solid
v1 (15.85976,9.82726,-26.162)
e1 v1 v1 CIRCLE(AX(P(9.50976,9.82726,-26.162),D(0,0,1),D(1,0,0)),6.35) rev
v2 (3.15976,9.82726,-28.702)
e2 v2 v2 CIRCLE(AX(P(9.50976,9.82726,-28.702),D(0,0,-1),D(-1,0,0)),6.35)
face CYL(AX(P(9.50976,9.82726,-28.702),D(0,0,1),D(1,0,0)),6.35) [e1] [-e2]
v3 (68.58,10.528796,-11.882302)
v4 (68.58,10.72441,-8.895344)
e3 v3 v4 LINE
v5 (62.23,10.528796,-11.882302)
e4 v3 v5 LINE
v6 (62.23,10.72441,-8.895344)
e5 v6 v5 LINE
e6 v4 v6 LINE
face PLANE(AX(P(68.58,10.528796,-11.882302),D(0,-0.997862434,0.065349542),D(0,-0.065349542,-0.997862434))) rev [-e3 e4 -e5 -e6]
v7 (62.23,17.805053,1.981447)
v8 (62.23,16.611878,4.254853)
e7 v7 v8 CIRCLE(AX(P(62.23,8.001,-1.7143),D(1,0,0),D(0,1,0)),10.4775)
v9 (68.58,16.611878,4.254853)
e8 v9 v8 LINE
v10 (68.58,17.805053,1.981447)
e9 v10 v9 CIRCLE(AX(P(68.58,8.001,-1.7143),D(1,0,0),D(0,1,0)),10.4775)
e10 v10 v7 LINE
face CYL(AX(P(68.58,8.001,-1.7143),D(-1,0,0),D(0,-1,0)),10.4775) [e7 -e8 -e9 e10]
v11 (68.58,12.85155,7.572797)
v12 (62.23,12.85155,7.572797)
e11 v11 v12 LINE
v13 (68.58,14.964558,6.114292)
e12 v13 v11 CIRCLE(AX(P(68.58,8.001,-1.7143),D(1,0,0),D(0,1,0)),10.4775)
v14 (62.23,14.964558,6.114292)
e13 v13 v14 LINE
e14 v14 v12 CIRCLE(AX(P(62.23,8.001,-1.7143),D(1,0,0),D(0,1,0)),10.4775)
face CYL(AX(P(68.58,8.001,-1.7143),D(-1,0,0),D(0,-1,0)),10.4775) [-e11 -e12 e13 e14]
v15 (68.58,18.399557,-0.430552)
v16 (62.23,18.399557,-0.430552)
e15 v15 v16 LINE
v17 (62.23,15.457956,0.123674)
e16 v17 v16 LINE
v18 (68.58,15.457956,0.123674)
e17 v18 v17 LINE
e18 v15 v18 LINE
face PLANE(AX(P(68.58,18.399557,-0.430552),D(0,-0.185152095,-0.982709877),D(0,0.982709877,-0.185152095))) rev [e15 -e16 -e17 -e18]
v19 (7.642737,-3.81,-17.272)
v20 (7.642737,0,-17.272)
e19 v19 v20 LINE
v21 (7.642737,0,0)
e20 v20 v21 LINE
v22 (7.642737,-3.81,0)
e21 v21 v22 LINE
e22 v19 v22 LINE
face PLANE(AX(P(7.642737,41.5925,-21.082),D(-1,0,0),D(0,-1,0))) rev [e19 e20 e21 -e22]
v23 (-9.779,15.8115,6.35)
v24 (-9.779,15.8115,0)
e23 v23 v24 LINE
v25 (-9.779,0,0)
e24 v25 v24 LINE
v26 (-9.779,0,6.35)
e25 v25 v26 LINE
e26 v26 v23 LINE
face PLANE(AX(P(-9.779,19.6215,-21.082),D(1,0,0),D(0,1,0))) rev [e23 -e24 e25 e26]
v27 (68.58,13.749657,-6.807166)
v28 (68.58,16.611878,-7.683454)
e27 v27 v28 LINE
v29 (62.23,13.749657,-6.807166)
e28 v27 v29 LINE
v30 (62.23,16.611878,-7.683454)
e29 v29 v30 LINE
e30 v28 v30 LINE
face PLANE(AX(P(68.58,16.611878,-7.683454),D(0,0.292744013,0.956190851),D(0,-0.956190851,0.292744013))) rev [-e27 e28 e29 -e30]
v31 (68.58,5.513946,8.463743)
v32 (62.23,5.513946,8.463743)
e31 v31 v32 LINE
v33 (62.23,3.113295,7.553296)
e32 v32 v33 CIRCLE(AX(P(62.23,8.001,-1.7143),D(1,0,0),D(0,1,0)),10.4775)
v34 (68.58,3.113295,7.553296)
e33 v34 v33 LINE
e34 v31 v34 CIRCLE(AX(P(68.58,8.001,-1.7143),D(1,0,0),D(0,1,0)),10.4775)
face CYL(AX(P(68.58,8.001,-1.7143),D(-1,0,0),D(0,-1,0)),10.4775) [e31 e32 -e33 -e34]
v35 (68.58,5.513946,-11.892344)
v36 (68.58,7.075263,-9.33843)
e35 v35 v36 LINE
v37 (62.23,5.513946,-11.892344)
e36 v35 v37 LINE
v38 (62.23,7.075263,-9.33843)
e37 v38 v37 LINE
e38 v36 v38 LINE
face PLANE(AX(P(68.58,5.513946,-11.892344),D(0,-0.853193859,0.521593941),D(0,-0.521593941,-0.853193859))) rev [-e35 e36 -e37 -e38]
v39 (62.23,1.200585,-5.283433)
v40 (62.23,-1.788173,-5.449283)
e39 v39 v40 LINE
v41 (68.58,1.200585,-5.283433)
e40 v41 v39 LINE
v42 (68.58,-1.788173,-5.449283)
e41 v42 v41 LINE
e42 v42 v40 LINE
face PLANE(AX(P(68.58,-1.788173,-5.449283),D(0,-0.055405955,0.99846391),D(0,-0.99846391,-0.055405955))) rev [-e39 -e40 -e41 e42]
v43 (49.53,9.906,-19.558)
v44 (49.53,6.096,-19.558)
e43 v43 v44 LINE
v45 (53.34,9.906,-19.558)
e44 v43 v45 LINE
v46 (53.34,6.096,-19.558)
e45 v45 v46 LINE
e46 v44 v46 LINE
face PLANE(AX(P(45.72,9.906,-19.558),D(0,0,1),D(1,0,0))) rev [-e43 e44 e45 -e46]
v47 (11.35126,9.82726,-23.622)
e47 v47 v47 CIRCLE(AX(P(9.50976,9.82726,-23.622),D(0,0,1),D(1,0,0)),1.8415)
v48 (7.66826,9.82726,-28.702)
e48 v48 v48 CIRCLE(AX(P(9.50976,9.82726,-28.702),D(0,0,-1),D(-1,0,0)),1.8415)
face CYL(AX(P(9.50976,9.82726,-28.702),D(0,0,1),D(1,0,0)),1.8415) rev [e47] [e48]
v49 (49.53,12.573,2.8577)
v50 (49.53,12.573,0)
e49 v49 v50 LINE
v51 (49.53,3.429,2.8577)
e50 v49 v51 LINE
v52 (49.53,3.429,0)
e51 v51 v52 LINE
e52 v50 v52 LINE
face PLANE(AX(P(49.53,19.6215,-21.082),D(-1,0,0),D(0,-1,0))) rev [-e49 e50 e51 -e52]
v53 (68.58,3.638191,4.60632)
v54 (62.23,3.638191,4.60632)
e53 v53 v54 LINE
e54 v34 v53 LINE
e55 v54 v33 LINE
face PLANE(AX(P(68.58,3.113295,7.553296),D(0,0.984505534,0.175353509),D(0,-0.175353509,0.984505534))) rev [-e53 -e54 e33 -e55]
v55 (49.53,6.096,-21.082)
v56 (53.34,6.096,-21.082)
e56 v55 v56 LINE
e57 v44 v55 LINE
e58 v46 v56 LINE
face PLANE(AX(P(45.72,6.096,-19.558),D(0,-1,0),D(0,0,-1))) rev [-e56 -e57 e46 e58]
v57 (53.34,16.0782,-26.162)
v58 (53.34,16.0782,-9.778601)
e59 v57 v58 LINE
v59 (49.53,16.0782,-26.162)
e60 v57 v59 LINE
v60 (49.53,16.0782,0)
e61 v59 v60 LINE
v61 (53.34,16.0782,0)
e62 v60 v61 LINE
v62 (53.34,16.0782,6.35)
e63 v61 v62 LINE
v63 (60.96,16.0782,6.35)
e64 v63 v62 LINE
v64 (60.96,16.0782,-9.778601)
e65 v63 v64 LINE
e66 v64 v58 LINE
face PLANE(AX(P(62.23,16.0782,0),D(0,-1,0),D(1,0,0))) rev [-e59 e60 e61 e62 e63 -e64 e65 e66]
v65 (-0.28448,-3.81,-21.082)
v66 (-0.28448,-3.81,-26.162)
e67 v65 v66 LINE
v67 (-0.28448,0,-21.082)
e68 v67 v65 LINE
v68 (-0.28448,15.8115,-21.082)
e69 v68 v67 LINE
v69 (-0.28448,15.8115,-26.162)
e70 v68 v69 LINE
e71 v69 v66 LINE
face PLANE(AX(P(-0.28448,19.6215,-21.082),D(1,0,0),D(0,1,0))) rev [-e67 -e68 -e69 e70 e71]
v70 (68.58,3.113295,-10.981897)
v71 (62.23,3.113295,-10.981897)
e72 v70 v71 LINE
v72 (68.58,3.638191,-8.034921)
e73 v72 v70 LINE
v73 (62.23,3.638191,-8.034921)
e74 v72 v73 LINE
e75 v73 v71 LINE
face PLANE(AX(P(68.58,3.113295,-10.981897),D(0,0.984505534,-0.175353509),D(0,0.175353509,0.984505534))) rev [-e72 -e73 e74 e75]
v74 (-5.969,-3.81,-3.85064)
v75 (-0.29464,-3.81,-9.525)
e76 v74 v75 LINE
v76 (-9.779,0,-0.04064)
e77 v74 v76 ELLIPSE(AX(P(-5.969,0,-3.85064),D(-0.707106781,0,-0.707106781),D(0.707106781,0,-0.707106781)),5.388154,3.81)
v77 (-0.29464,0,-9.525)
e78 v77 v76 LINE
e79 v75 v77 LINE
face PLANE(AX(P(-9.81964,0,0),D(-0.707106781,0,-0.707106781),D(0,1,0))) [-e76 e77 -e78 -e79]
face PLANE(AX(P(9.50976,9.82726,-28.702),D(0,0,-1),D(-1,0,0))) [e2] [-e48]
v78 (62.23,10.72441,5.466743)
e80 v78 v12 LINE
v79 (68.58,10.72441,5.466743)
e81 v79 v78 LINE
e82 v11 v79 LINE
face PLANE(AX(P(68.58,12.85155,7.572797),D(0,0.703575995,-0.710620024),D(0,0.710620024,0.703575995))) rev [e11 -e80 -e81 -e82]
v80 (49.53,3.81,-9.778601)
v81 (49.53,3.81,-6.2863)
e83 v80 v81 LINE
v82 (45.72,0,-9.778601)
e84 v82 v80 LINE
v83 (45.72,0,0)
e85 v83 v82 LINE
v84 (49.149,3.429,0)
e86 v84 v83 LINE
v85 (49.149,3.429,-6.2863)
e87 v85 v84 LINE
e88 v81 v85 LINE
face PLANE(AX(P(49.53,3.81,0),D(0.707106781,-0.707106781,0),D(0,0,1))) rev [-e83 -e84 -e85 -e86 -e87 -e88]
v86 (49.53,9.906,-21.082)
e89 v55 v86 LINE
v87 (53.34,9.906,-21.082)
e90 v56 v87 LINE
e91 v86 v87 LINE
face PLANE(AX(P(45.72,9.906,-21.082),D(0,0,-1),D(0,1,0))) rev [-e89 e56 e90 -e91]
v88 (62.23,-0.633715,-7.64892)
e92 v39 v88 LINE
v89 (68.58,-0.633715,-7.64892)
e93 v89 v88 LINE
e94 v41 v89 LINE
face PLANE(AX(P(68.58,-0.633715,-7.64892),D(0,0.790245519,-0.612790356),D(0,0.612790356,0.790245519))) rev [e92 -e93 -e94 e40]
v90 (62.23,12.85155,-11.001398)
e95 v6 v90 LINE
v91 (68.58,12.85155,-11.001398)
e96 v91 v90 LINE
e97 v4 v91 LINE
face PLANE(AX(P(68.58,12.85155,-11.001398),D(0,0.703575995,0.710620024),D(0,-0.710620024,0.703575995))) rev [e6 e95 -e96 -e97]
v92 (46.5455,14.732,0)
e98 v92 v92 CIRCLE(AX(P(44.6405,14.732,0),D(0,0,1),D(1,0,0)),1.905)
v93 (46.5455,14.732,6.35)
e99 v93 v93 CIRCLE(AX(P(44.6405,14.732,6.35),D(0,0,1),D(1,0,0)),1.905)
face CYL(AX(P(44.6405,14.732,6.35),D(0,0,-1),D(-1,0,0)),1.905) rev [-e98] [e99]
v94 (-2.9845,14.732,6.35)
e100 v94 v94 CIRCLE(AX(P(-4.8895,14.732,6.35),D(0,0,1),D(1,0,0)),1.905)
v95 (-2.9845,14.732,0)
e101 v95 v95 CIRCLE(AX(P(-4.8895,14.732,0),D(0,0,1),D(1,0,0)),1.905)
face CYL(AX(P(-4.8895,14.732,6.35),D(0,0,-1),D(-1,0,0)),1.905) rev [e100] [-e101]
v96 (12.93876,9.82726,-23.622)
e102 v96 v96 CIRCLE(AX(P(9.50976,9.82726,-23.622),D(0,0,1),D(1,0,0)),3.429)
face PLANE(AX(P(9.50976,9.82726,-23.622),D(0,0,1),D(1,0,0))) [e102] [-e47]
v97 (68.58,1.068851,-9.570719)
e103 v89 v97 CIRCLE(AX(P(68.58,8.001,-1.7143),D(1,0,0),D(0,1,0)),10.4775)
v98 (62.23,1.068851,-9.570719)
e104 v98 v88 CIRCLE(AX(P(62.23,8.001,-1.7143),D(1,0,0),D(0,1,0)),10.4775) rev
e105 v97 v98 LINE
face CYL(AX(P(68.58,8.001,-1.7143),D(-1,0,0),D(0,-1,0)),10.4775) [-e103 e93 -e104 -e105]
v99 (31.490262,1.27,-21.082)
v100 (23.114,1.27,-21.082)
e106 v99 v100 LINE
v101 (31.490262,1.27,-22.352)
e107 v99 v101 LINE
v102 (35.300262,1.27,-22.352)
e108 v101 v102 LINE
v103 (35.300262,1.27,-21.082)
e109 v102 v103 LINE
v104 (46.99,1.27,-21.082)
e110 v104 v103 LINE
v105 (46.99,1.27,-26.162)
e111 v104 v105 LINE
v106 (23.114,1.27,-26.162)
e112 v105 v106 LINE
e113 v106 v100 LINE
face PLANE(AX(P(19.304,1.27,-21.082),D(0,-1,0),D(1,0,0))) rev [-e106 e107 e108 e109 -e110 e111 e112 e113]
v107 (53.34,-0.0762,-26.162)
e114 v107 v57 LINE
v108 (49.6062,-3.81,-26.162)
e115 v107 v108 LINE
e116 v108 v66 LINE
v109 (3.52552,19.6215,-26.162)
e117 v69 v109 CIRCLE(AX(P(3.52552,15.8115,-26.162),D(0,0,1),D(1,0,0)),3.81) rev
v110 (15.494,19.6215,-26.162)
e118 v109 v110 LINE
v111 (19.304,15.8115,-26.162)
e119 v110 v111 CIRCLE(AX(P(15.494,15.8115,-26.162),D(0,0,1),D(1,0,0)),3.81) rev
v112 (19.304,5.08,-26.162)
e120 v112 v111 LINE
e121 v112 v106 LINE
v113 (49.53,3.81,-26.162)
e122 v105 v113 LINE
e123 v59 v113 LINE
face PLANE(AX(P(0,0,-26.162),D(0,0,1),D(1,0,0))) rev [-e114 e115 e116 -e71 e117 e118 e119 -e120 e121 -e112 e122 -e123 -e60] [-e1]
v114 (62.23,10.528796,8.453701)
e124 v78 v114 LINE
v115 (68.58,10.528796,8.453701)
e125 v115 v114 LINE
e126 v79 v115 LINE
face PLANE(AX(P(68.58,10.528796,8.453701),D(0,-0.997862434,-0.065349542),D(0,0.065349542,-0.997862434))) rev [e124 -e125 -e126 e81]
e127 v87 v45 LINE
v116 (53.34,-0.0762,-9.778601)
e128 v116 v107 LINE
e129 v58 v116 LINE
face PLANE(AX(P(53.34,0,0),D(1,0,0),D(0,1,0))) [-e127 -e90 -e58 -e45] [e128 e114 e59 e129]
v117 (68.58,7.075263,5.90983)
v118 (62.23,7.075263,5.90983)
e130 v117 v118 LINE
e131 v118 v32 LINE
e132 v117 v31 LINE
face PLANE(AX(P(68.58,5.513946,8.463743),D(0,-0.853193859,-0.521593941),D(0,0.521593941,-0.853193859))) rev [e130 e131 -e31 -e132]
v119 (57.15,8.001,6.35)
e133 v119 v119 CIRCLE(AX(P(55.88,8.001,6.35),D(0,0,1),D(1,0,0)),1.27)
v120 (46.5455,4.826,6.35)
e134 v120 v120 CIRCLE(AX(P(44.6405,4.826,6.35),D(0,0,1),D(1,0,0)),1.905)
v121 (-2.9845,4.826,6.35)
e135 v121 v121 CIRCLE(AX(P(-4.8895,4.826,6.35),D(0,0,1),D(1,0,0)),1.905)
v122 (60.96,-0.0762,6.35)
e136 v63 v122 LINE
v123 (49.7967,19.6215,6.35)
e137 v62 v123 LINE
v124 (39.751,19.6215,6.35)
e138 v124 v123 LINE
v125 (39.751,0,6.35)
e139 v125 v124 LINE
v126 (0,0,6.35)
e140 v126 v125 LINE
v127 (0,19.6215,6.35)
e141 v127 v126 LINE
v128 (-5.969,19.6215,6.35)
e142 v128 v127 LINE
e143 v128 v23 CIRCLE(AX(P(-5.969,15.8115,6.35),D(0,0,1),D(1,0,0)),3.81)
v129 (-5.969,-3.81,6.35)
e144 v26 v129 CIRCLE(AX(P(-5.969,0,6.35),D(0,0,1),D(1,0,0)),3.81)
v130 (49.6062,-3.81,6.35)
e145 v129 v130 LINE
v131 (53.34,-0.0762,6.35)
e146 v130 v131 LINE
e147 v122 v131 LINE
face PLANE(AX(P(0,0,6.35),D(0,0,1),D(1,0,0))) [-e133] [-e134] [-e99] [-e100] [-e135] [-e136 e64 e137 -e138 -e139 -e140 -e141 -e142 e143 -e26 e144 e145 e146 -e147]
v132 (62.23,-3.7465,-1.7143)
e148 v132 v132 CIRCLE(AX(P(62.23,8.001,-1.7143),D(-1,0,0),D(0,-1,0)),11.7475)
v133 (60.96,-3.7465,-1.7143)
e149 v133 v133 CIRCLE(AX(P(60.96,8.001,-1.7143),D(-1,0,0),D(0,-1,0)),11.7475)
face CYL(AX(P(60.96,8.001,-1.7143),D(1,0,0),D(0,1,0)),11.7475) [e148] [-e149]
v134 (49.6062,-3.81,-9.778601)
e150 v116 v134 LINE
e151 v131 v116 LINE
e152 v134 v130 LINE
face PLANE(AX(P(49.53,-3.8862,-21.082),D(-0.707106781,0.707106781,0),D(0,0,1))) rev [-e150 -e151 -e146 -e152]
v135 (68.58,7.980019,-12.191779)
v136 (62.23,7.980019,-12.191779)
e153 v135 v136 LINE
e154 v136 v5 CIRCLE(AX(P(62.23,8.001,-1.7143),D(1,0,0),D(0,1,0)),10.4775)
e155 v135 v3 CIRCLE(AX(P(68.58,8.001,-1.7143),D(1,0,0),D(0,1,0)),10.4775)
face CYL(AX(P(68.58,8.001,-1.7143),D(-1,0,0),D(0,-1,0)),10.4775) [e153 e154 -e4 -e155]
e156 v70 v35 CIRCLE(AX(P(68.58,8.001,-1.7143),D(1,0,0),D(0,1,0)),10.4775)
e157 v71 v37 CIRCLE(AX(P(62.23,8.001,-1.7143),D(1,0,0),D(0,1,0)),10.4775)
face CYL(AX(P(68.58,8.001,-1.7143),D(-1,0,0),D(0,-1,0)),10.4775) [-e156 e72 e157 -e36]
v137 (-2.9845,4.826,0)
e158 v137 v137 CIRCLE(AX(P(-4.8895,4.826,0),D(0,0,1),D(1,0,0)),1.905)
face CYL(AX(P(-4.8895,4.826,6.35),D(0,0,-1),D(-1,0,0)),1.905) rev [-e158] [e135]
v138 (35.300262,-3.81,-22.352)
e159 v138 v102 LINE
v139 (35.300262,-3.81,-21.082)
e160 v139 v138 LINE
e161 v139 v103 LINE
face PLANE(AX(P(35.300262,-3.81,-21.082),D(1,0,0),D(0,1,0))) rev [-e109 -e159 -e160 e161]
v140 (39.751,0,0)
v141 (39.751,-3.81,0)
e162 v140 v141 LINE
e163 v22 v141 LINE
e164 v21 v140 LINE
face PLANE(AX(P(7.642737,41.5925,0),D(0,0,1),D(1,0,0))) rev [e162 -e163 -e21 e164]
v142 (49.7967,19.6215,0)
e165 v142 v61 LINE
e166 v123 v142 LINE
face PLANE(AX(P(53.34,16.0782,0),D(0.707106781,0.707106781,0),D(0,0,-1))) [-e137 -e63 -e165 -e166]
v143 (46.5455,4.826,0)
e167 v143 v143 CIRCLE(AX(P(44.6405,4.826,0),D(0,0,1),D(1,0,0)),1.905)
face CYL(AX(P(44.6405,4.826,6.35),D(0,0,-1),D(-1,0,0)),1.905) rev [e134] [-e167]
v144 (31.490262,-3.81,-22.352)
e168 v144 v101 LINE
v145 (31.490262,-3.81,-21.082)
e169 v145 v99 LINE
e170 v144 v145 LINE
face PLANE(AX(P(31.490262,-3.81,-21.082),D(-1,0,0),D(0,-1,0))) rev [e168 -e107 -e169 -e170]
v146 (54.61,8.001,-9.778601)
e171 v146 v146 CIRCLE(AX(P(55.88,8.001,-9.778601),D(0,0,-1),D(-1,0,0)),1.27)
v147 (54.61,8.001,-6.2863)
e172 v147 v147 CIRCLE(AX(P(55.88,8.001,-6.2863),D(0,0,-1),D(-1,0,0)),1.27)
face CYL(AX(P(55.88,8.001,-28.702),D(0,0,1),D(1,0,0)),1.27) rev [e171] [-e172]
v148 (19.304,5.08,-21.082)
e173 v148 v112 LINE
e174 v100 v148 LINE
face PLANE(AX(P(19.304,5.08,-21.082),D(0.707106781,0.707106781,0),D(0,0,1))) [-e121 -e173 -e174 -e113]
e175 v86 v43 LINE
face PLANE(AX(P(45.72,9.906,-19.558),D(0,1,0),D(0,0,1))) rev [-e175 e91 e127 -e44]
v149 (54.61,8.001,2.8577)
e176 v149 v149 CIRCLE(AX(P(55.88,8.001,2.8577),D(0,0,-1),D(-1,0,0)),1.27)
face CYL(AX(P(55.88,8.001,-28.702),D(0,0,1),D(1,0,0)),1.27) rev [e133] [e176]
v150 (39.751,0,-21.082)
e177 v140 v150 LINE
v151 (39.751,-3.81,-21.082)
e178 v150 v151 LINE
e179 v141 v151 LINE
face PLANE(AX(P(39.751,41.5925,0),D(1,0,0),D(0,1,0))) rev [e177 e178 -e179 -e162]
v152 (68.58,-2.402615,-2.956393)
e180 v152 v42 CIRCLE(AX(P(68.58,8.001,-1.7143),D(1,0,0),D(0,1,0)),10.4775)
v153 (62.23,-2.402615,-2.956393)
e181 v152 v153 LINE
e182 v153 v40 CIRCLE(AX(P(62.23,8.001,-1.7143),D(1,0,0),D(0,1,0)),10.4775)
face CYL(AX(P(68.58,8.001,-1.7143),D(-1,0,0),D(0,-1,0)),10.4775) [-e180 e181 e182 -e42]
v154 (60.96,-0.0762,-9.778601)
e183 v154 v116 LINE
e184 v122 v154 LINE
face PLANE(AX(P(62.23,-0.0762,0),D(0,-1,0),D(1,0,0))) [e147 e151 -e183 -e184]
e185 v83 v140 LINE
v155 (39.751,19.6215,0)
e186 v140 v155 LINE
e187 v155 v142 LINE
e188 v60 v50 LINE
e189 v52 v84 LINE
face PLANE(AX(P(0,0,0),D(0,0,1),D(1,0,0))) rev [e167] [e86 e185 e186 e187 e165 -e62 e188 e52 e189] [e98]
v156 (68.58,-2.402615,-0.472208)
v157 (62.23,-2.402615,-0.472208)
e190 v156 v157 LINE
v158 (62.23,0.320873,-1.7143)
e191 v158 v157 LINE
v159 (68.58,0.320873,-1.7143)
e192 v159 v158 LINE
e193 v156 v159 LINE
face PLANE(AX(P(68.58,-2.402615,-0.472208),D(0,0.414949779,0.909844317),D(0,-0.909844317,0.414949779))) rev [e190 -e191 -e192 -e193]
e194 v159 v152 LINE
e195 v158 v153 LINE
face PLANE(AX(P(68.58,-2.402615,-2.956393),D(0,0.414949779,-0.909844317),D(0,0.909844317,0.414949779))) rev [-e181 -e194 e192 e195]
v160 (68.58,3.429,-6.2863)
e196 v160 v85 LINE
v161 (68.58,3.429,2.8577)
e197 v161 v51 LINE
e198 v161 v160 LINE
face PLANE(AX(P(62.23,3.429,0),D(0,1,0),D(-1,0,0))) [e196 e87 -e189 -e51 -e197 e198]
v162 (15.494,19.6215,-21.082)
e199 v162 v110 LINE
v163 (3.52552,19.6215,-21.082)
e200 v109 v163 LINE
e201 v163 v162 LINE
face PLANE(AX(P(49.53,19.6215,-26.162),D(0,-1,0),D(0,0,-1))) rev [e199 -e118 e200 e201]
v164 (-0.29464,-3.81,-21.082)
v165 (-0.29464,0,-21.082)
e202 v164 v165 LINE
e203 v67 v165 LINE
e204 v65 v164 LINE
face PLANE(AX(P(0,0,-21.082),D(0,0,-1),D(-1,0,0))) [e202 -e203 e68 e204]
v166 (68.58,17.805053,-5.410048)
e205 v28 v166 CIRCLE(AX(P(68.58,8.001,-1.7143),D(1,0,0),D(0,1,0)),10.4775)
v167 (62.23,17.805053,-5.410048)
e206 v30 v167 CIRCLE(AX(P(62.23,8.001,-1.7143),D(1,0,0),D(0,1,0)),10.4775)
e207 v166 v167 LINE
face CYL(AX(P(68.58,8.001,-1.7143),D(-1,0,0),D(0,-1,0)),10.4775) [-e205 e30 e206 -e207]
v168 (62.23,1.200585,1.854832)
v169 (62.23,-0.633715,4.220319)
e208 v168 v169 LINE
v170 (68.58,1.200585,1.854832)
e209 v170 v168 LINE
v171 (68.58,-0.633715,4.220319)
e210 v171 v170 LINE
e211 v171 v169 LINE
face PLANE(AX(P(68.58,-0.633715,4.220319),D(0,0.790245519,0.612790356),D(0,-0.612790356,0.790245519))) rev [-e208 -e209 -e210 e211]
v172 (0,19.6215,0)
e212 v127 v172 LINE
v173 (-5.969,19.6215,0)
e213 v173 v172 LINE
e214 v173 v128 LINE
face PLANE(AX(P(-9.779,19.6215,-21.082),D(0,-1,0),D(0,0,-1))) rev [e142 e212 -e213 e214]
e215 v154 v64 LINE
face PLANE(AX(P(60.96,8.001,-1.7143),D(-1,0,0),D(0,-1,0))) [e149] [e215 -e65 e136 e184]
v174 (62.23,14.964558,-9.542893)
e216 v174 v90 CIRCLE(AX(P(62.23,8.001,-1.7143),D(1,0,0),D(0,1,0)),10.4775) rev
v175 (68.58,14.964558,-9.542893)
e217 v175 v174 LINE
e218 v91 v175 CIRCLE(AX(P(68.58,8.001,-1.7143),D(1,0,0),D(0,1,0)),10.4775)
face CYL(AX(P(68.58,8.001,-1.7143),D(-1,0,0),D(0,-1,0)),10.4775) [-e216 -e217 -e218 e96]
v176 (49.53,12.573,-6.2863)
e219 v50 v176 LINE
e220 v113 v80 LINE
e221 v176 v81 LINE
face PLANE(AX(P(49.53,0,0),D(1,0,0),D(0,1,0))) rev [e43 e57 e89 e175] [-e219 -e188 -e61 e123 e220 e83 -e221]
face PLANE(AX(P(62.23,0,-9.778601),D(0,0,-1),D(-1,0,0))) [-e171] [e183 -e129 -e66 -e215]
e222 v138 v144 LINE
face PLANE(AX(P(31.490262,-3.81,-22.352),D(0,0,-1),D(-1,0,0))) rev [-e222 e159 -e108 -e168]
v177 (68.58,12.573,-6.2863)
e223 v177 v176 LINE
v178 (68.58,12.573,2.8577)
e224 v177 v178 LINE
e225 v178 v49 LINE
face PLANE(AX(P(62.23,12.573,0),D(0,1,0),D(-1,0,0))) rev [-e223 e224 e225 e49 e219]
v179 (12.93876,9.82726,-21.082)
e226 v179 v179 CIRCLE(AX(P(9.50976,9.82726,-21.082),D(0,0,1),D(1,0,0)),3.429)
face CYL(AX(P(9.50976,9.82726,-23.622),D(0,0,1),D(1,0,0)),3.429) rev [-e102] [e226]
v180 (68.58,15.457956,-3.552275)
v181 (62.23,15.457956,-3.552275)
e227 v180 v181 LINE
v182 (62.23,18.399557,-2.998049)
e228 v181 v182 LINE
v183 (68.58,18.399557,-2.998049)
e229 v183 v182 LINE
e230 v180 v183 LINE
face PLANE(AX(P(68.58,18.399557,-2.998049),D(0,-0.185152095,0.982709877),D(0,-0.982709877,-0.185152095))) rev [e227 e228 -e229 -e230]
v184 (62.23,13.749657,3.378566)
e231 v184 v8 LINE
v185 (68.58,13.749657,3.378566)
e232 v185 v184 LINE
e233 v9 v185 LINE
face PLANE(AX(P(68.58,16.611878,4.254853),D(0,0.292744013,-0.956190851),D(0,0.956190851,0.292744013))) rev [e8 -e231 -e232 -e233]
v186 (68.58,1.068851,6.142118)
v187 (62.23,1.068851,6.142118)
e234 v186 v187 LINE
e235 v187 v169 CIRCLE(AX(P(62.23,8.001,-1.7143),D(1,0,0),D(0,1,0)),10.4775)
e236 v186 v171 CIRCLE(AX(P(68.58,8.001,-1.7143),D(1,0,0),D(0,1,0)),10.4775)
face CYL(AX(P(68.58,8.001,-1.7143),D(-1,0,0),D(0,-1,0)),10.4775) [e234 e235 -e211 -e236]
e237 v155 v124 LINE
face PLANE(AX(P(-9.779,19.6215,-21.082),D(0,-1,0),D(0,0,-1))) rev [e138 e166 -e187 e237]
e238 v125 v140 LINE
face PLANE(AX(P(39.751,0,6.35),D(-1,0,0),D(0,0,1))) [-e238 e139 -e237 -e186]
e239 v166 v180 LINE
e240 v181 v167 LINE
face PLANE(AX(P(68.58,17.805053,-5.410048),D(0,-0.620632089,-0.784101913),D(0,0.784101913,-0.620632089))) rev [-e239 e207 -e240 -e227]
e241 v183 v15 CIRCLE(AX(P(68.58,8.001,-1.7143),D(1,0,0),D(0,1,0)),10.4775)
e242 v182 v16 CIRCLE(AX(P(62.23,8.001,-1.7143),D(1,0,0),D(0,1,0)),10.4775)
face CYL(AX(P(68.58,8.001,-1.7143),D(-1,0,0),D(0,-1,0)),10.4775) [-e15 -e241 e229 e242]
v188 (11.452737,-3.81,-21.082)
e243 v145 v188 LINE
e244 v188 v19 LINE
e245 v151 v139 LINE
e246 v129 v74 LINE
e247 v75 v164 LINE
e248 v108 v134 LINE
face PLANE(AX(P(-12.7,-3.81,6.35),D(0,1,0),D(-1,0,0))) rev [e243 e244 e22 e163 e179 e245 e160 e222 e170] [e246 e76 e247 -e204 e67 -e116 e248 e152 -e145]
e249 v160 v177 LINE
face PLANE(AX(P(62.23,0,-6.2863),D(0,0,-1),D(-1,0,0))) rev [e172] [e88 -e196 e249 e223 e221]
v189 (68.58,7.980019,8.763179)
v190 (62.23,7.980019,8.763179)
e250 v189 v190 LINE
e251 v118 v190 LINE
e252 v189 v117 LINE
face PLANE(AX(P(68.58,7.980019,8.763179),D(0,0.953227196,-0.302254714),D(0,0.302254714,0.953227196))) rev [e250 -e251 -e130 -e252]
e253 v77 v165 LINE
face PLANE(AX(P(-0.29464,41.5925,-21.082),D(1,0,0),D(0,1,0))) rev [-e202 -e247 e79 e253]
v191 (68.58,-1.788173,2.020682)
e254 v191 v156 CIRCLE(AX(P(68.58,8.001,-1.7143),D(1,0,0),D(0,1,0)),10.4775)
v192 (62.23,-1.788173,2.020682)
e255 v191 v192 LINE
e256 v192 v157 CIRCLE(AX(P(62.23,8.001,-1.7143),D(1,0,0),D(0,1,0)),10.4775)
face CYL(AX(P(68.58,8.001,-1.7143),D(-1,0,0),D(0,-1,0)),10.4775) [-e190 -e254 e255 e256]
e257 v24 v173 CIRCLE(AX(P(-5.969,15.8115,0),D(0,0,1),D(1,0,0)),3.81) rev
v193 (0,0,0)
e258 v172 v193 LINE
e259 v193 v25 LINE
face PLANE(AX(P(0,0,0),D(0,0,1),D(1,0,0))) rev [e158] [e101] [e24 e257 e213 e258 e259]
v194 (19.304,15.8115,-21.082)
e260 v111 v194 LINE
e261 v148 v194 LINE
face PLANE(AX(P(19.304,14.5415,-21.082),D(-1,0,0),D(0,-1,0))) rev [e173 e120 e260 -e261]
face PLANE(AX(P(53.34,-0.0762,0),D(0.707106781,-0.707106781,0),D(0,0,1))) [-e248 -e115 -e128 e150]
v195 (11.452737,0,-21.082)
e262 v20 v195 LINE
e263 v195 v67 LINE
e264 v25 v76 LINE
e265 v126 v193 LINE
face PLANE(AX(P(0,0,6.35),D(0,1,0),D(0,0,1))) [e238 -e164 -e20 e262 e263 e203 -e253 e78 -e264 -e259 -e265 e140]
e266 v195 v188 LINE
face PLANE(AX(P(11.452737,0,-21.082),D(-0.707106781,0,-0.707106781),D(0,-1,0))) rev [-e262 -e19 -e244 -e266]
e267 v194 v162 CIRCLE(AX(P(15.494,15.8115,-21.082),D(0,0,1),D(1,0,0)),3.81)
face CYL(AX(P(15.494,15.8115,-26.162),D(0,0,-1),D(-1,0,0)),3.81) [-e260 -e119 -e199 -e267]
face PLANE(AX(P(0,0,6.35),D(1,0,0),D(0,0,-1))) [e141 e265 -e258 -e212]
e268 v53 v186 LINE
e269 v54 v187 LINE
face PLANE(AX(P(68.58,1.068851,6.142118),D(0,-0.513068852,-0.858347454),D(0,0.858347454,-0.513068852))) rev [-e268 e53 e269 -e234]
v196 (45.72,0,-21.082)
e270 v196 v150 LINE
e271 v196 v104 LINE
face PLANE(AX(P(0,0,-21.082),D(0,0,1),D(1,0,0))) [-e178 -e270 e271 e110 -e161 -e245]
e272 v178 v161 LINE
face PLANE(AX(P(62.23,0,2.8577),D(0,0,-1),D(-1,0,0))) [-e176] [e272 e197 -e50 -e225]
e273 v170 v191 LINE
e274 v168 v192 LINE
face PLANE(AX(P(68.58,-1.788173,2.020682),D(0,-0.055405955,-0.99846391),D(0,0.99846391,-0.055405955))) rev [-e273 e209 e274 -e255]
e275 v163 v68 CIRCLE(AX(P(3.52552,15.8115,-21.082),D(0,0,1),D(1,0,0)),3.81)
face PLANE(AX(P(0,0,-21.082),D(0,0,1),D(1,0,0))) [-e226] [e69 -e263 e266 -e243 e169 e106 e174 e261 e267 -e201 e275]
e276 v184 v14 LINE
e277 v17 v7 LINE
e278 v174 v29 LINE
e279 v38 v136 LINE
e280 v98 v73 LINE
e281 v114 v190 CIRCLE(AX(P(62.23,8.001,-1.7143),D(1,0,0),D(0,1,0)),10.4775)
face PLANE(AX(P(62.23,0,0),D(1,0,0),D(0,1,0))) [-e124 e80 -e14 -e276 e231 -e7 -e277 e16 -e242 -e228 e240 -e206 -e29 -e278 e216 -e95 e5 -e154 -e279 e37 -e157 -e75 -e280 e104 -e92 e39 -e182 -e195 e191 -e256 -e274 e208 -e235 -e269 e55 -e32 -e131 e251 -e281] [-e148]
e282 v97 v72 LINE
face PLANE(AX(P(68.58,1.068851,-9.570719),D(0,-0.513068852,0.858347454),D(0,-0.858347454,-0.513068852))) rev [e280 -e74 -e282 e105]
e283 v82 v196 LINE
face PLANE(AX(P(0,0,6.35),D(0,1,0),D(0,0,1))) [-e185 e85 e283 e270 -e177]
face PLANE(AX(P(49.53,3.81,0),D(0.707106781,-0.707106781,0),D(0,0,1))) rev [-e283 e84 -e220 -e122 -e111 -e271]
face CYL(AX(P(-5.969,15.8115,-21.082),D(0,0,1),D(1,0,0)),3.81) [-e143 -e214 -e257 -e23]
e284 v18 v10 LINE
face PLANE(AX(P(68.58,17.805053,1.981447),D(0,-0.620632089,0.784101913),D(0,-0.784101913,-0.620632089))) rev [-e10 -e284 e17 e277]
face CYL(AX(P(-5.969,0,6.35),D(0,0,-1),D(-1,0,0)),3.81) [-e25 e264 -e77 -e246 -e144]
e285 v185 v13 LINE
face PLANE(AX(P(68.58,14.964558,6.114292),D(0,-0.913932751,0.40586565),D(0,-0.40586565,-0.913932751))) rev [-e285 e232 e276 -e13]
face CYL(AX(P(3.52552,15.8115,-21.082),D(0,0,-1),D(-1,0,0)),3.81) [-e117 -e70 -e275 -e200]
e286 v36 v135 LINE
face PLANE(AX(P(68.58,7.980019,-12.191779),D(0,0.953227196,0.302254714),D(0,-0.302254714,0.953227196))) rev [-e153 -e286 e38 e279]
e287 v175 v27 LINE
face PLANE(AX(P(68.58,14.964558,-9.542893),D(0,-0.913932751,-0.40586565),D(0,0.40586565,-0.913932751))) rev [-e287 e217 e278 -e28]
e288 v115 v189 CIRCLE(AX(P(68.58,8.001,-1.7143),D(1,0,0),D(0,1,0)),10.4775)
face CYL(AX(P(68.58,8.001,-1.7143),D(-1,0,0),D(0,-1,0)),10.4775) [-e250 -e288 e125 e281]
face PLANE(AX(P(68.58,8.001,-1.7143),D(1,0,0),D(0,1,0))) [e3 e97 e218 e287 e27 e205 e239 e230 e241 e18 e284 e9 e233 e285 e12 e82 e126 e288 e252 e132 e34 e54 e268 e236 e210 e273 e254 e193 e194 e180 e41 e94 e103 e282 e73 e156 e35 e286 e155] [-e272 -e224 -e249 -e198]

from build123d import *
from build123d.topology import SkipClean

# Parameters (mm, degrees)
SKETCH1_W                = 65.151
SKETCH1_H                = 27.178
SKETCH1_R                = 1.905
SKETCH1_W_2              = 39.751
SKETCH1_H_2              = 19.558
BOSS_EXTRUDE1_DEPTH      = 6.35
SKETCH2_W                = 39.751
SKETCH2_H                = 10.24711365
CUT_EXTRUDE1_DEPTH       = 58.77104227
SKETCH3_W                = 65.151
SKETCH3_H                = 3.81
BOSS_EXTRUDE2_DEPTH      = 27.432
CUT_EXTRUDE2_DEPTH       = 64.637138913
CUT_EXTRUDE2_DEPTH_BACK  = 64.637138913
SKETCH5_W                = 59.309
SKETCH5_H                = 23.4315
BOSS_EXTRUDE3_DEPTH      = 5.08
SKETCH6_R                = 6.35
SKETCH6_R_2              = 1.8415
BOSS_EXTRUDE4_DEPTH      = 2.54
CUT_EXTRUDE3_DEPTH       = 63.411972459
CUT_EXTRUDE3_DEPTH_BACK  = 63.411972459
SKETCH7_R                = 1.8415
SKETCH8_R                = 3.429
CUT_EXTRUDE4_DEPTH       = 2.54
SKETCH9_R                = 3.6195
SKETCH9_W                = 2.794
SKETCH9_H                = 1.524
BOSS_EXTRUDE5_DEPTH      = 3.81
CUT_EXTRUDE5_DEPTH       = 74.064442174
CUT_EXTRUDE5_DEPTH_BACK  = 74.064442174
SKETCH10_W               = 32.108263301
SKETCH10_H               = 21.082
SKETCH12_W               = 16.128600802
SKETCH12_H               = 16.1544
SKETCH12_W_2             = 9.144
SKETCH12_H_2             = 9.144
BOSS_EXTRUDE8_DEPTH      = 12.7
CHAMFER1_SIZE            = 3.81
SKETCH13_W               = 16.383399198
SKETCH13_H               = 19.8882
BOSS_EXTRUDE9_DEPTH      = 3.81
CHAMFER2_SIZE            = 3.7338
CHAMFER3_SIZE            = 3.7338
CUT_EXTRUDE7_DEPTH       = 83.650781365
CUT_EXTRUDE7_DEPTH_BACK  = 83.650781365
SKETCH14_R               = 1.27
SKETCH15_W               = 15.950556953
SKETCH15_H               = 26.00484576
SKETCH15_W_2             = 25.3365
SKETCH15_H_2             = 13.2715
CUT_EXTRUDE8_DEPTH       = 5.08
CHAMFER4_SIZE            = 9.525
FILLET1_R                = 3.81
CUT_EXTRUDE9_DEPTH       = 6.35
CHAMFER6_SIZE            = 3.81
FILLET2_R                = 3.81
CHAMFER7_SIZE            = 3.81
CUT_EXTRUDE10_DEPTH      = 71.944733816
CUT_EXTRUDE10_DEPTH_BACK = 71.944733816
SKETCH17_W               = 3.81
SKETCH17_H               = 1.27
SKETCH18_W               = 9.144
SKETCH18_H               = 9.144
BOSS_EXTRUDE10_DEPTH     = 6.35
SKETCH19_R               = 11.7475
SKETCH19_W               = 9.144
SKETCH19_H               = 9.144
BOSS_EXTRUDE11_DEPTH     = 1.27
SKETCH20_W               = 1.524
SKETCH20_H               = 3.81
CUT_EXTRUDE11_DEPTH      = 7.62


# Some blends are built 0.0001 mm under size
with BuildPart() as part:
    # Sketch1 → Boss-Extrude1 (new body)
    with BuildSketch(Plane.XY):
        with Locations((19.8755, 9.779)):
            Rectangle(SKETCH1_W, SKETCH1_H)
        with Locations((-4.8895, 14.732)):
            Circle(SKETCH1_R, mode=Mode.SUBTRACT)
        with Locations((-4.8895, 4.826)):
            Circle(SKETCH1_R, mode=Mode.SUBTRACT)
        with Locations((44.6405, 14.732)):
            Circle(SKETCH1_R, mode=Mode.SUBTRACT)
        with Locations((44.6405, 4.826)):
            Circle(SKETCH1_R, mode=Mode.SUBTRACT)
        with Locations((19.8755, 9.779)):
            Rectangle(SKETCH1_W_2, SKETCH1_H_2, mode=Mode.SUBTRACT)
    extrude(amount=BOSS_EXTRUDE1_DEPTH)

    # Sketch2 → Cut-Extrude1 (cut, through all)
    with BuildSketch(Plane.XY.offset(6.35)):
        with Locations((19.8755, 24.681556825)):
            Rectangle(SKETCH2_W, SKETCH2_H)
    extrude(amount=-CUT_EXTRUDE1_DEPTH, mode=Mode.SUBTRACT)

    # Sketch3 → Boss-Extrude2 (add)
    with BuildSketch(Plane.XY.offset(6.35)):
        with Locations((19.8755, -1.905)):
            Rectangle(SKETCH3_W, SKETCH3_H)
    extrude(amount=-BOSS_EXTRUDE2_DEPTH)

    # Sketch4 → Cut-Extrude2 (cut, two sides: drawn at the far end of the back side and taken through both)
    with BuildSketch(Plane.XY.offset(6.35).offset(-CUT_EXTRUDE2_DEPTH_BACK)):
        Polygon((-9.779, 19.6215), (49.53, 19.6215), (49.53, -10.761505665), (52.451, -10.761505665), (52.451, 19.6215), (59.186276442, 19.6215), (59.186276442, 27.845167488), (-19.143020513, 27.845167488), (-19.143020513, 19.6215), (-12.7, 19.6215), (-12.7, -7.490212521), (-9.779, -7.490212521), align=None)
    extrude(amount=CUT_EXTRUDE2_DEPTH + CUT_EXTRUDE2_DEPTH_BACK, mode=Mode.SUBTRACT)

    # Sketch5 → Boss-Extrude3 (add)
    with BuildSketch(Plane(origin=(0, 0, -21.082), x_dir=(-1, 0, 0), z_dir=(0, 0, -1))):
        with Locations((-19.8755, 7.90575)):
            Rectangle(SKETCH5_W, SKETCH5_H)
    extrude(amount=BOSS_EXTRUDE3_DEPTH)

    # Sketch6 → Boss-Extrude4 (add)
    with BuildSketch(Plane(origin=(0, 0, -26.162), x_dir=(-1, 0, 0), z_dir=(0, 0, -1))):
        with Locations(Location((-9.50976, 9.82726, 0), (0, 0, 180))):
            Circle(SKETCH6_R)
        with Locations((-9.50976, 9.82726)):
            Circle(SKETCH6_R_2, mode=Mode.SUBTRACT)
    extrude(amount=BOSS_EXTRUDE4_DEPTH)

    # Sketch7 → Cut-Extrude3 (cut, two sides: drawn at the far end of the back side and taken through both)
    with SkipClean():  # the faces are left unmerged after this step: merging them gives an invalid solid
        with BuildSketch(Plane(origin=(0, 0, -26.162), x_dir=(-1, 0, 0), z_dir=(0, 0, -1)).offset(-CUT_EXTRUDE3_DEPTH_BACK)):
            with Locations(Location((-9.50976, 9.82726, 0), (0, 0, 180))):
                Circle(SKETCH7_R)
        extrude(amount=CUT_EXTRUDE3_DEPTH + CUT_EXTRUDE3_DEPTH_BACK, mode=Mode.SUBTRACT)
    add(part.part.scale(1), mode=Mode.REPLACE)  # the faces are merged on a copy

    # Sketch8 → Cut-Extrude4 (cut)
    with BuildSketch(Plane.XY.offset(-21.082)):
        with Locations((9.50976, 9.82726)):
            Circle(SKETCH8_R)
    extrude(amount=-CUT_EXTRUDE4_DEPTH, mode=Mode.SUBTRACT)

    # Sketch9 → Boss-Extrude5 (add)
    with BuildSketch(Plane(origin=(0, 0, -26.162), x_dir=(-1, 0, 0), z_dir=(0, 0, -1))):
        with BuildLine():
            Line((-35.644817518, 19.6215), (-35.644817518, 35.2425))
            ThreePointArc((-35.644817518, 35.2425), (-29.294817518, 41.5925), (-22.944817518, 35.2425))
            Line((-22.944817518, 35.2425), (-22.944817518, 28.829))
            Line((-22.944817518, 28.829), (-22.944817518, 25.2095))
            Line((-22.944817518, 25.2095), (-22.944817518, 19.6215))
            ThreePointArc((-22.944817518, 19.6215), (-29.294817518, 13.2715), (-35.644817518, 19.6215))
        make_face()
        with Locations((-29.294817518, 28.829)):
            Circle(SKETCH9_R, mode=Mode.SUBTRACT)
        with Locations((-29.294817518, 37.0205)):
            Rectangle(SKETCH9_W, SKETCH9_H, mode=Mode.SUBTRACT)
    extrude(amount=-BOSS_EXTRUDE5_DEPTH)

    # Sketch10 → Cut-Extrude5 (cut, two sides: drawn at the far end of the back side and taken through both)
    with SkipClean():  # the faces are left unmerged after this step: merging them gives an invalid solid
        with BuildSketch(Plane.XZ.offset(3.81).offset(-CUT_EXTRUDE5_DEPTH_BACK)):
            with Locations((23.69686835, -10.541)):
                Rectangle(SKETCH10_W, SKETCH10_H)
            Polygon((-9.779, 0), (-9.779, -26.162), (-0.29464, -26.162), (-0.29464, -21.082), (-0.29464, 0), align=None)
        extrude(amount=CUT_EXTRUDE5_DEPTH + CUT_EXTRUDE5_DEPTH_BACK, mode=Mode.SUBTRACT)

    # Sketch12 → Boss-Extrude8 (add)
    with SkipClean():  # the faces are left unmerged after this step: merging them gives an invalid solid
        with BuildSketch(Plane(origin=(49.53, 0, 0), x_dir=(0, 0, -1), z_dir=(1, 0, 0))):
            with Locations((1.714300401, 8.001)):
                Rectangle(SKETCH12_W, SKETCH12_H)
            with Locations((1.714300401, 8.001)):
                Rectangle(SKETCH12_W_2, SKETCH12_H_2, mode=Mode.SUBTRACT)
        extrude(amount=BOSS_EXTRUDE8_DEPTH)

    # Chamfer1
    # the kernel refuses this chamfer: 3.81 mm, written as the material it adds along each edge
    with BuildSketch(Plane(origin=(49.53, 0, 9.798112184), x_dir=(-0.9996219169112968, -0.02749587661058634, 0), z_dir=(0, 0, -1))) as chamfer1_piece_1_section:
        Polygon((CHAMFER1_SIZE * 0.999621916911, CHAMFER1_SIZE * 0.0274958766106), (-CHAMFER1_SIZE * 0.0274958766106, CHAMFER1_SIZE * 0.999621916911), (0, 0), align=None)
    chamfer1_piece_1 = extrude(amount=19.576712986, mode=Mode.PRIVATE)
    chamfer1_piece_1 = split(chamfer1_piece_1, bisect_by=Plane(origin=(48.248454545, 3.429, -3.1431502), z_dir=(0, -1, 0)), keep=Keep.TOP, mode=Mode.PRIVATE)
    chamfer1_piece_1 = split(chamfer1_piece_1, bisect_by=Plane(origin=(48.248454545, 1.246909091, 2.857699599), z_dir=(0, 0, -1)), keep=Keep.TOP, mode=Mode.PRIVATE)
    add(chamfer1_piece_1)
    with BuildSketch(Plane(origin=(49.53, 0, 9.798112184), x_dir=(-0.9996219169112968, -0.02749587661058634, 0), z_dir=(0, 0, -1))) as chamfer1_piece_2_section:
        Polygon((CHAMFER1_SIZE * 0.999621916911, CHAMFER1_SIZE * 0.0274958766106), (-CHAMFER1_SIZE * 0.0274958766106, CHAMFER1_SIZE * 0.999621916911), (0, 0), align=None)
    chamfer1_piece_2 = extrude(amount=19.576712986, mode=Mode.PRIVATE)
    chamfer1_piece_2 = split(chamfer1_piece_2, bisect_by=Plane(origin=(49.403, 3.556, -6.286300401), z_dir=(0, 0, -1)), keep=Keep.TOP, mode=Mode.PRIVATE)
    add(chamfer1_piece_2)
    with BuildSketch(Plane(origin=(49.53, -0.0762, 6.35), x_dir=(-0.027495876610586376, -0.9996219169112968, 0), z_dir=(0, 0, -1))) as chamfer1_piece_3_section:
        Polygon((CHAMFER1_SIZE * 0.999621916911, -CHAMFER1_SIZE * 0.0274958766106), (-CHAMFER1_SIZE * 0.0274958766106, -CHAMFER1_SIZE * 0.999621916911), (0, 0), align=None)
    chamfer1_piece_3 = extrude(amount=16.128600802, mode=Mode.PRIVATE)
    chamfer1_piece_3 = split(chamfer1_piece_3, bisect_by=Plane(origin=(50.800498039, -3.81, -1.714300401), z_dir=(0, 1, 0)), keep=Keep.TOP, mode=Mode.PRIVATE)
    add(chamfer1_piece_3)
    with BuildSketch(Plane(origin=(49.53, 16.0782, 0), x_dir=(-0.027495876610586386, 0.9996219169112968, 0), z_dir=(0, 0, 1))) as chamfer1_piece_4_section:
        Polygon((CHAMFER1_SIZE * 0.999621916911, -CHAMFER1_SIZE * 0.0274958766106), (-CHAMFER1_SIZE * 0.0274958766106, -CHAMFER1_SIZE * 0.999621916911), (0, 0), align=None)
    chamfer1_piece_4 = extrude(amount=6.35, mode=Mode.PRIVATE)
    chamfer1_piece_4 = split(chamfer1_piece_4, bisect_by=Plane(origin=(50.805815888, 19.6215, 3.175), z_dir=(0, -1, 0)), keep=Keep.TOP, mode=Mode.PRIVATE)
    add(chamfer1_piece_4)

    # Sketch13 → Boss-Extrude9 (add)
    with BuildSketch(Plane(origin=(49.53, 0, 0), x_dir=(0, 0, -1), z_dir=(1, 0, 0))):
        with Locations((17.970300401, 6.1341)):
            Rectangle(SKETCH13_W, SKETCH13_H)
    extrude(amount=BOSS_EXTRUDE9_DEPTH)

    # Chamfer2
    chamfer2_edges = [part.edges().sort_by_distance(p)[0] for p in [
        (53.34, -3.81, -17.970300401),
    ]]
    chamfer(chamfer2_edges, length=CHAMFER2_SIZE - 0.0001)  # a hair under: the kernel refuses the full size

    # Chamfer3
    # the kernel refuses this chamfer: 3.7338 mm, written as the material it adds along each edge
    with BuildSketch(Plane(origin=(49.53, 16.0782, -21.082), x_dir=(0.9996219169112968, -0.027495876610586435, 0), z_dir=(0, 0, -1))) as chamfer3_piece_1_section:
        Polygon((CHAMFER3_SIZE * 0.999621916911, -CHAMFER3_SIZE * 0.0274958766106), (-CHAMFER3_SIZE * 0.0274958766106, -CHAMFER3_SIZE * 0.999621916911), (0, 0), align=None)
    chamfer3_piece_1 = extrude(amount=5.08, mode=Mode.PRIVATE)
    chamfer3_piece_1 = split(chamfer3_piece_1, bisect_by=Plane(origin=(50.777682524, 19.6215, -23.622), z_dir=(0, -1, 0)), keep=Keep.TOP, mode=Mode.PRIVATE)
    add(chamfer3_piece_1)

    # Sketch14 → Cut-Extrude7 (cut, two sides: drawn at the far end of the back side and taken through both)
    with BuildSketch(Plane.XY.offset(6.35).offset(-CUT_EXTRUDE7_DEPTH_BACK)):
        with Locations(Location((55.88, 8.001, 0), (0, 0, 180))):
            Circle(SKETCH14_R)
    extrude(amount=CUT_EXTRUDE7_DEPTH + CUT_EXTRUDE7_DEPTH_BACK, mode=Mode.SUBTRACT)

    # Sketch15 → Cut-Extrude8 (cut)
    with BuildSketch(Plane(origin=(0, 0, -26.162), x_dir=(-1, 0, 0), z_dir=(0, 0, -1))):
        with Locations((8.259758477, 6.61907712)):
            Rectangle(SKETCH15_W, SKETCH15_H)
        with Locations((-31.97225, 7.90575)):
            Rectangle(SKETCH15_W_2, SKETCH15_H_2)
    extrude(amount=-CUT_EXTRUDE8_DEPTH, mode=Mode.SUBTRACT)

    # Chamfer4
    # the kernel refuses this chamfer: 9.525 mm, written as the material it adds along each edge
    with BuildSketch(Plane(origin=(-0.29464, -3.81, 0), x_dir=(-0.9996219169112966, 0, 0.027495876610586358), z_dir=(0, 1, 0))) as chamfer4_piece_1_section:
        Polygon((CHAMFER4_SIZE * 0.999621916911, -CHAMFER4_SIZE * 0.0274958766106), (-CHAMFER4_SIZE * 0.0274958766106, -CHAMFER4_SIZE * 0.999621916911), (0, 0), align=None)
    chamfer4_piece_1 = extrude(amount=3.81, mode=Mode.PRIVATE)
    chamfer4_piece_1 = split(chamfer4_piece_1, bisect_by=Plane(origin=(-9.779, -1.905, -3.148349728), z_dir=(1, 0, 0)), keep=Keep.TOP, mode=Mode.PRIVATE)
    add(chamfer4_piece_1)

    # Fillet1
    fillet1_edges = [part.edges().sort_by_distance(p)[0] for p in [
        (-9.779, -3.81, 3.15468),
        (-9.779, 19.6215, 3.175),
        (-0.28448, 19.6215, -23.622),
    ]]
    fillet(fillet1_edges, radius=FILLET1_R - 0.0001)  # a hair under: the kernel refuses the full size

    # Sketch16 → Cut-Extrude9 (cut)
    with BuildSketch(Plane(origin=(0, 0, -26.162), x_dir=(-1, 0, 0), z_dir=(0, 0, -1))):
        Polygon((-49.53, 1.27), (-19.304, 1.27), (-19.304, 48.700808031), (-49.53, 48.700808031), (-49.53, 22.932024955), (-53.34, 22.932024955), (-53.34, 16.0782), (-49.53, 16.0782), align=None)
    extrude(amount=-CUT_EXTRUDE9_DEPTH, mode=Mode.SUBTRACT)

    # Chamfer6
    chamfer6_edges = [part.edges().sort_by_distance(p)[0] for p in [
        (49.53, 0, -15.430300401),
        (7.642736699, -1.905, -21.082),
    ]]
    chamfer(chamfer6_edges, length=CHAMFER6_SIZE)

    # Fillet2
    fillet2_edges = [part.edges().sort_by_distance(p)[0] for p in [
        (19.304, 19.6215, -23.622),
    ]]
    fillet(fillet2_edges, radius=FILLET2_R)

    # Chamfer7
    chamfer7_edges = [part.edges().sort_by_distance(p)[0] for p in [
        (19.304, 1.27, -23.622),
    ]]
    chamfer(chamfer7_edges, length=CHAMFER7_SIZE)

    # Sketch17 → Cut-Extrude10 (cut, two sides: drawn at the far end of the back side and taken through both)
    with BuildSketch(Plane(origin=(0, 1.27, 0), x_dir=(1, 0, 0), z_dir=(0, 1, 0)).offset(-CUT_EXTRUDE10_DEPTH_BACK)):
        with Locations((33.395261943, 21.717)):
            Rectangle(SKETCH17_W, SKETCH17_H)
    extrude(amount=CUT_EXTRUDE10_DEPTH + CUT_EXTRUDE10_DEPTH_BACK, mode=Mode.SUBTRACT)

    # Sketch18 → Boss-Extrude10 (add)
    with BuildSketch(Plane(origin=(62.23, 0, 0), x_dir=(0, 0, -1), z_dir=(1, 0, 0))):
        with BuildLine():
            Line((2.998048785, 18.399557416), (3.552275043, 15.457956254))
            Line((3.552275043, 15.457956254), (5.410048246, 17.805052943))
            ThreePointArc((5.410048246, 17.805052943), (6.583437436, 17.278365509), (7.68345373, 16.611877701))
            Line((7.68345373, 16.611877701), (6.807166487, 13.749657442))
            Line((6.807166487, 13.749657442), (9.542893183, 14.964558093))
            ThreePointArc((9.542893183, 14.964558093), (10.337113856, 13.952898384), (11.001397584, 12.851549677))
            Line((11.001397584, 12.851549677), (8.895343686, 10.724410489))
            Line((8.895343686, 10.724410489), (11.882301857, 10.528796003))
            ThreePointArc((11.882301857, 10.528796003), (12.115407629, 9.263923067), (12.191779394, 7.980019178))
            Line((12.191779394, 7.980019178), (9.33843041, 7.075263014))
            Line((9.33843041, 7.075263014), (11.892343936, 5.513946312))
            ThreePointArc((11.892343936, 5.513946312), (11.510933084, 4.285627296), (10.981897035, 3.113295132))
            Line((10.981897035, 3.113295132), (8.034920829, 3.638190726))
            Line((8.034920829, 3.638190726), (9.5707189, 1.068850649))
            ThreePointArc((9.5707189, 1.068850649), (8.662168053, 0.158478636), (7.648919973, -0.633714632))
            Line((7.648919973, -0.633714632), (5.28343328, 1.200585465))
            Line((5.28343328, 1.200585465), (5.449283066, -1.788173139))
            ThreePointArc((5.449283066, -1.788173139), (4.221730274, -2.172042892), (2.956393088, -2.402615333))
            Line((2.956393088, -2.402615333), (1.714300401, 0.32087322))
            Line((1.714300401, 0.32087322), (0.472207714, -2.402615333))
            ThreePointArc((0.472207714, -2.402615333), (-0.793129472, -2.172042892), (-2.020682264, -1.788173139))
            Line((-2.020682264, -1.788173139), (-1.854832478, 1.200585465))
            Line((-1.854832478, 1.200585465), (-4.220319172, -0.633714632))
            ThreePointArc((-4.220319172, -0.633714632), (-5.233567251, 0.158478636), (-6.142118098, 1.068850649))
            Line((-6.142118098, 1.068850649), (-4.606320027, 3.638190726))
            Line((-4.606320027, 3.638190726), (-7.553296233, 3.113295132))
            ThreePointArc((-7.553296233, 3.113295132), (-8.082332282, 4.285627296), (-8.463743134, 5.513946312))
            Line((-8.463743134, 5.513946312), (-5.909829608, 7.075263014))
            Line((-5.909829608, 7.075263014), (-8.763178592, 7.980019178))
            ThreePointArc((-8.763178592, 7.980019178), (-8.686806827, 9.263923067), (-8.453701055, 10.528796003))
            Line((-8.453701055, 10.528796003), (-5.466742884, 10.724410489))
            Line((-5.466742884, 10.724410489), (-7.572796782, 12.851549677))
            ThreePointArc((-7.572796782, 12.851549677), (-6.908513054, 13.952898384), (-6.114292381, 14.964558093))
            Line((-6.114292381, 14.964558093), (-3.378565685, 13.749657442))
            Line((-3.378565685, 13.749657442), (-4.254852928, 16.611877701))
            ThreePointArc((-4.254852928, 16.611877701), (-3.154836634, 17.278365509), (-1.981447444, 17.805052943))
            Line((-1.981447444, 17.805052943), (-0.123674241, 15.457956254))
            Line((-0.123674241, 15.457956254), (0.430552017, 18.399557416))
            ThreePointArc((0.430552017, 18.399557416), (1.714300401, 18.4785), (2.998048785, 18.399557416))
        make_face()
        with Locations((1.714300401, 8.001)):
            Rectangle(SKETCH18_W, SKETCH18_H, mode=Mode.SUBTRACT)
    extrude(amount=BOSS_EXTRUDE10_DEPTH)

    # Sketch19 → Boss-Extrude11 (add)
    with BuildSketch(Plane.ZY.offset(-62.23)):
        with Locations(Location((-1.714300401, 8.001, 0), (0, 0, 270))):
            Circle(SKETCH19_R)
        with Locations((-1.714300401, 8.001)):
            Rectangle(SKETCH19_W, SKETCH19_H, mode=Mode.SUBTRACT)
    extrude(amount=BOSS_EXTRUDE11_DEPTH)

    # Sketch20 → Cut-Extrude11 (cut)
    with BuildSketch(Plane(origin=(53.34, 0, 0), x_dir=(0, 0, -1), z_dir=(1, 0, 0))):
        with Locations((20.32, 8.001)):
            Rectangle(SKETCH20_W, SKETCH20_H)
    extrude(amount=-CUT_EXTRUDE11_DEPTH, mode=Mode.SUBTRACT)


solid = part.part
